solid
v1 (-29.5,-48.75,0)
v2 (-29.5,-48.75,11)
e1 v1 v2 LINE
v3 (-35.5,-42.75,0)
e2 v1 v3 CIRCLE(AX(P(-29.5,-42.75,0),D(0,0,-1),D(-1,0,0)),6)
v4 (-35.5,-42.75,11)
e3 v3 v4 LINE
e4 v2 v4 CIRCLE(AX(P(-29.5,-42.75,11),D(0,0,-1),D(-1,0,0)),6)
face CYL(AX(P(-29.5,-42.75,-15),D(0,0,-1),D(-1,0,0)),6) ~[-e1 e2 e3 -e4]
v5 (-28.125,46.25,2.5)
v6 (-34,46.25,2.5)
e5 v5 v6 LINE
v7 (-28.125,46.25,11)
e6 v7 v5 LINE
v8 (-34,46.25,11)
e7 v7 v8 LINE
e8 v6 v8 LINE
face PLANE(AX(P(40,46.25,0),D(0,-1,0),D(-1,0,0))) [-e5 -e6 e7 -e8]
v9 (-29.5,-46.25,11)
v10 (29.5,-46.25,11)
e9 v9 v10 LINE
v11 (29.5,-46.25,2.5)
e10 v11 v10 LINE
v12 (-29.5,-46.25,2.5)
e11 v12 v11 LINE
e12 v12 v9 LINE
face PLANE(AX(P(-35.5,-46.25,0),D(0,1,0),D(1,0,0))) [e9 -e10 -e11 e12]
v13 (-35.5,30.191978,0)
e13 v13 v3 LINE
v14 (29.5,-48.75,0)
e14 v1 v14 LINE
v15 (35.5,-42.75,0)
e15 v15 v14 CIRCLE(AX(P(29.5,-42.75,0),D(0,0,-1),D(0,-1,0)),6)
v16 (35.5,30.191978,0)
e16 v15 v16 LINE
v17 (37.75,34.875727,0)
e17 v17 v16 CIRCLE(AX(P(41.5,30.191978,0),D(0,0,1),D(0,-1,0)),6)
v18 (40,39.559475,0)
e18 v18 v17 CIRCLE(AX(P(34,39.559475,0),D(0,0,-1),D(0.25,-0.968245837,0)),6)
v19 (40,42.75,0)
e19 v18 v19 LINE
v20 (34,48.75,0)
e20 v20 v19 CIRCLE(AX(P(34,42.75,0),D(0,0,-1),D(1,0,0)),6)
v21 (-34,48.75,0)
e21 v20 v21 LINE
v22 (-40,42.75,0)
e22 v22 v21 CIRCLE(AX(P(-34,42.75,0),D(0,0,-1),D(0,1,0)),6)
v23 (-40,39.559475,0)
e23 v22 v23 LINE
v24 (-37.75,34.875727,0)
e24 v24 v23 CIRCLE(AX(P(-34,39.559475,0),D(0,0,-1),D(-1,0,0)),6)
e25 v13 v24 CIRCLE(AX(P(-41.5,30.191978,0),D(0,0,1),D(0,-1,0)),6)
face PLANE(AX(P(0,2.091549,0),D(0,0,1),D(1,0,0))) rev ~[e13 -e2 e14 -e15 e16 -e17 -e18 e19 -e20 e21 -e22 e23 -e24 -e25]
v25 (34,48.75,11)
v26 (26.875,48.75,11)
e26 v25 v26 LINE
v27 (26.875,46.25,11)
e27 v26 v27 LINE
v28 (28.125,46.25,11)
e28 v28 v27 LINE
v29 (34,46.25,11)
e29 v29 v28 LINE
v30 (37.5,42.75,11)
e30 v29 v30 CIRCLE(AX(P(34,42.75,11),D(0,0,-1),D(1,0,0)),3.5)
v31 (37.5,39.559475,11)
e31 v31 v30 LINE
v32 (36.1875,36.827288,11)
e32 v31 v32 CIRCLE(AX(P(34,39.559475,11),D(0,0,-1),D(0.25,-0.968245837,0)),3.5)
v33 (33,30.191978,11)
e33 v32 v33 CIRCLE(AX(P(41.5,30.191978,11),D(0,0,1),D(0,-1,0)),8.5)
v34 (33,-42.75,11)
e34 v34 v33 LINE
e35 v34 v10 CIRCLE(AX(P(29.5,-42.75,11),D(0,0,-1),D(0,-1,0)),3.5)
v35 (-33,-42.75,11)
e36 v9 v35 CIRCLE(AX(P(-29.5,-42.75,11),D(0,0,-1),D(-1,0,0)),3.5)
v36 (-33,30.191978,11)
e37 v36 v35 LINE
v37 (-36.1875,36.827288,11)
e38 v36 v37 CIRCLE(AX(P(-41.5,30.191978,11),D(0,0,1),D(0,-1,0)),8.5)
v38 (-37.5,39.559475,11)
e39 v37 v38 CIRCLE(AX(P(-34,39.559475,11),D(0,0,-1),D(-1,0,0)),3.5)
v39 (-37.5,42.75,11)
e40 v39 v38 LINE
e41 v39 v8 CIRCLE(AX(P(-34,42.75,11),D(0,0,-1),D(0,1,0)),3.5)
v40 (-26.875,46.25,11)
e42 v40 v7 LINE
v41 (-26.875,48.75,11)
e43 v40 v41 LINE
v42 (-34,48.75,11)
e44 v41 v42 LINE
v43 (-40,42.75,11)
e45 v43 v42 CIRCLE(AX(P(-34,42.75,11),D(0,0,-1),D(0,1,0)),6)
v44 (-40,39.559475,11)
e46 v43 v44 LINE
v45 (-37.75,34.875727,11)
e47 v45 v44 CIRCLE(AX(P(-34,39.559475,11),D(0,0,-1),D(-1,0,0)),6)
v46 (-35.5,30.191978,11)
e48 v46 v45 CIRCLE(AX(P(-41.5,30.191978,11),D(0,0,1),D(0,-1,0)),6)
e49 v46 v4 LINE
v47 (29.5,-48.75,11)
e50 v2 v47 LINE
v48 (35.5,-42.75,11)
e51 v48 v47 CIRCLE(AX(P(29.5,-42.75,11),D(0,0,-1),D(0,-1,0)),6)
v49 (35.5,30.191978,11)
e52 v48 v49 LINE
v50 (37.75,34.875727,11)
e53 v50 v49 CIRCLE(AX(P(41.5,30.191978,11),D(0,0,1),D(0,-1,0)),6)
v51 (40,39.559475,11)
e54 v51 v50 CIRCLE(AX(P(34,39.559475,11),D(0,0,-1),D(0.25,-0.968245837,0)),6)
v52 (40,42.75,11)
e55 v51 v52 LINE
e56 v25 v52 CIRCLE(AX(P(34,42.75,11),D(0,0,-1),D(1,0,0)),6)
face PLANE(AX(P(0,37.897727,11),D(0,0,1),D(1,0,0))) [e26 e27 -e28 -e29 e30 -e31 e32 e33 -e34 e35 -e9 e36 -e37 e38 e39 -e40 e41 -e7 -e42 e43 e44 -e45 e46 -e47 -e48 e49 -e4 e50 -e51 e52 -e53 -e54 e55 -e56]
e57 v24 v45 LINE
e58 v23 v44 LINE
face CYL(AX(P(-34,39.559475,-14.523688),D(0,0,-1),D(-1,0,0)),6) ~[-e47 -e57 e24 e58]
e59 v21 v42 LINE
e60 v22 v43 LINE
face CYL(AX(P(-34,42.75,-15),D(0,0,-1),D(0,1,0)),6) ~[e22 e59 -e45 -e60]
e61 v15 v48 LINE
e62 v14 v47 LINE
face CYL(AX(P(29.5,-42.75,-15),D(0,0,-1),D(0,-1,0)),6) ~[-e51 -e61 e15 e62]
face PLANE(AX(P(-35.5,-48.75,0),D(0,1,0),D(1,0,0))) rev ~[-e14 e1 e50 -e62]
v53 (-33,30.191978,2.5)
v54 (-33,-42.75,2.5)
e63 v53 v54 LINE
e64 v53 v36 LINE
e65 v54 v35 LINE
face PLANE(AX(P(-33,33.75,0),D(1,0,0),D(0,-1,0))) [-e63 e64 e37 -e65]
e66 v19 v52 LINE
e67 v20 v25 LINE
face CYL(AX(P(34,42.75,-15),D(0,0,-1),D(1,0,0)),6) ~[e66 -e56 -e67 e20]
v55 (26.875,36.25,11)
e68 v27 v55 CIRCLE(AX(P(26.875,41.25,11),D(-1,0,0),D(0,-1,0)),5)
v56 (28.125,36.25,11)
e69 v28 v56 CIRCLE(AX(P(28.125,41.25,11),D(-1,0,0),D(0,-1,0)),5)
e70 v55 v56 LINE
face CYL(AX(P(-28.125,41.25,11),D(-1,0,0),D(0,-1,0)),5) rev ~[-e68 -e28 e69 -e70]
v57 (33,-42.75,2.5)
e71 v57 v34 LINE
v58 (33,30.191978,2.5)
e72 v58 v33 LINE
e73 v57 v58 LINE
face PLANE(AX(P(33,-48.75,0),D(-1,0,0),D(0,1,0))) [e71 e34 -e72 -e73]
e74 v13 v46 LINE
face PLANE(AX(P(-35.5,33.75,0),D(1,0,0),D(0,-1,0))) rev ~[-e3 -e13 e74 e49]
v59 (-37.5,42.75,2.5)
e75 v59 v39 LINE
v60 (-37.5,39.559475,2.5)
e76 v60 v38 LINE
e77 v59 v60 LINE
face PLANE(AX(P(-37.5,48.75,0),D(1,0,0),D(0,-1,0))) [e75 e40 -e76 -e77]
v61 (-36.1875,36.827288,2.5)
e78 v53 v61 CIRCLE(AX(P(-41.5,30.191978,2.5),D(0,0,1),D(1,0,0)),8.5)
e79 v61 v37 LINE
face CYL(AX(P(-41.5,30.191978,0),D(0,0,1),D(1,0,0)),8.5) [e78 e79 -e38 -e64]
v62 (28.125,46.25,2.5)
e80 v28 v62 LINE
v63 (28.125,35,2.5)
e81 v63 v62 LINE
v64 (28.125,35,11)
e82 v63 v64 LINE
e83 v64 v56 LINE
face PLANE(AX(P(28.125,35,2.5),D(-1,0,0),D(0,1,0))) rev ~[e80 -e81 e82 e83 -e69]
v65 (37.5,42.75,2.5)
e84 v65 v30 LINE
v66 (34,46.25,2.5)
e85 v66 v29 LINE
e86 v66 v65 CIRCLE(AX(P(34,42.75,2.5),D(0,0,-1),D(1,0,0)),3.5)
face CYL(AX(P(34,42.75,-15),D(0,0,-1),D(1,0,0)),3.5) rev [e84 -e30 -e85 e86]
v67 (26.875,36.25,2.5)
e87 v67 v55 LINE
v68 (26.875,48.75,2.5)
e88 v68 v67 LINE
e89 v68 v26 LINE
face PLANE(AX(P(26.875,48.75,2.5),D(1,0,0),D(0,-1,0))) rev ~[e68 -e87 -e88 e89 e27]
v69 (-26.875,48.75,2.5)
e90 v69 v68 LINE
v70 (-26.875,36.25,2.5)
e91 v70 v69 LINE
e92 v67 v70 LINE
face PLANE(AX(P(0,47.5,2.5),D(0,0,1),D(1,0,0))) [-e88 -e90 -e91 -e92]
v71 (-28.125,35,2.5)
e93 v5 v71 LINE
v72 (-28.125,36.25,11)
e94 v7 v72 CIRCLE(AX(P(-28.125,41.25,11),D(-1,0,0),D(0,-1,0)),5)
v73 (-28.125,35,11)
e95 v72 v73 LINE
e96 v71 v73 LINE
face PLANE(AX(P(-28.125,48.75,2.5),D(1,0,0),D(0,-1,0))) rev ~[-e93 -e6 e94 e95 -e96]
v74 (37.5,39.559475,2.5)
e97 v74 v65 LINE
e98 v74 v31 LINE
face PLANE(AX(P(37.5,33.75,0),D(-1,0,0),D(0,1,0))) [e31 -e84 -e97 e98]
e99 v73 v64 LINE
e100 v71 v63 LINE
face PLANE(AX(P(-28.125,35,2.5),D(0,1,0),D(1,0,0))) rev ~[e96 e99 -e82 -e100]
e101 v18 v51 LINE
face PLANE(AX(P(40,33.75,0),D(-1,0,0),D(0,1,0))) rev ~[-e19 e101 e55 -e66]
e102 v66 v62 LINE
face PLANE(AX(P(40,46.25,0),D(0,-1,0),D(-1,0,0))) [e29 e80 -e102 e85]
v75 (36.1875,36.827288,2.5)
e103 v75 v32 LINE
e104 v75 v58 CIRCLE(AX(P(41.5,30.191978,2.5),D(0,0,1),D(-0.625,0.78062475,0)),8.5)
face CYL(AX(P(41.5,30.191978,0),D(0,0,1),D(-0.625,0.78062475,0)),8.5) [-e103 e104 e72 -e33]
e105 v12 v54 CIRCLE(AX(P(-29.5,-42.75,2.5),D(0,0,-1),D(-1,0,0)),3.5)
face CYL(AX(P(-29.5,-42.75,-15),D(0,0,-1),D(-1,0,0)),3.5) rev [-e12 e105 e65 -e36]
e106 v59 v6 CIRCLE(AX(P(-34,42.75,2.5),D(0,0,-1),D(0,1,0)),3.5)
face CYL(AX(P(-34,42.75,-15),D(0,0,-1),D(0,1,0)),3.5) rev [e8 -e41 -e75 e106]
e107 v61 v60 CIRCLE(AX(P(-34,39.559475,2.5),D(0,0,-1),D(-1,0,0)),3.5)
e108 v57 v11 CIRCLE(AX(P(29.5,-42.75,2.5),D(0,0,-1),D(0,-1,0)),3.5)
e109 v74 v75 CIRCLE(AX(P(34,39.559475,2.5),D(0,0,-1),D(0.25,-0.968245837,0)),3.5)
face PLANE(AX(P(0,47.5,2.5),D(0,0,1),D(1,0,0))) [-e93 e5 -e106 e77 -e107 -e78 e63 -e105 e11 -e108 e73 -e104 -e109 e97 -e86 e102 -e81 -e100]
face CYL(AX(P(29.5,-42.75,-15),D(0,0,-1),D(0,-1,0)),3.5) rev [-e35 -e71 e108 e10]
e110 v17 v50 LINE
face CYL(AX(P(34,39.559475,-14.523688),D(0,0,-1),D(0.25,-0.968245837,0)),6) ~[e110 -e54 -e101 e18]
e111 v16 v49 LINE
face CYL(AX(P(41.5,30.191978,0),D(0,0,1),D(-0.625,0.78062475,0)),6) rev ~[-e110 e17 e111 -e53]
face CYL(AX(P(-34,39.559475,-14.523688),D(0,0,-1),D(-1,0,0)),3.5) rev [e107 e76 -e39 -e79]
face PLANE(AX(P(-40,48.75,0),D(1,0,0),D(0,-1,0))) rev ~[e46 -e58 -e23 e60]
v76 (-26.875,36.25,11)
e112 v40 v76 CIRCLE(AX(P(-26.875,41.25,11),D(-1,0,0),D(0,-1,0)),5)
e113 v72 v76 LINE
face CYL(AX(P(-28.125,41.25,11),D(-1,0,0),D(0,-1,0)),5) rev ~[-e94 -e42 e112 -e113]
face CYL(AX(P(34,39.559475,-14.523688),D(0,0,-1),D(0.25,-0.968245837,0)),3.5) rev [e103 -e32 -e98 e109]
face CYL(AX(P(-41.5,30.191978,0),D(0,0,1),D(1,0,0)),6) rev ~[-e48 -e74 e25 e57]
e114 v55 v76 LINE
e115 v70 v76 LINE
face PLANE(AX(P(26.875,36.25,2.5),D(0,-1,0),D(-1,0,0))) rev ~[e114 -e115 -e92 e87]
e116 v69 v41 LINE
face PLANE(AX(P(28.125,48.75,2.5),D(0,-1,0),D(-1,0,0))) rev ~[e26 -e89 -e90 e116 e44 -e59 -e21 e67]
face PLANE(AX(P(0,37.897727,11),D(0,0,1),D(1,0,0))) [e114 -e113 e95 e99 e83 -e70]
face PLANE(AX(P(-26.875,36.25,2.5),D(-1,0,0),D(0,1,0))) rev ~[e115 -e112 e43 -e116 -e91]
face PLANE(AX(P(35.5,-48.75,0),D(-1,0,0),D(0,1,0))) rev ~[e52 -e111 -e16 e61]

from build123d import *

# Parameters (mm, degrees)
F4_DEPTH    = 11
F5_T1_DEPTH = 41
F5_T3_DEPTH = 40.0473750966
F6_R        = 6
F7_T        = -2.5
F8_W        = 56.25
F8_H        = 2.5
F9_DEPTH    = 8.5
F11_DEPTH   = 8.5
F12_R       = 5
F13_DEPTH   = 56.25


# Not quite as in the source:
# - a fillet or chamfer that OpenCascade refuses, or shapes differently, is made with other operations: its cross-section is extruded or revolved along the edge and cut away or added


with BuildPart() as f4:
    # F3 (on Top) → F4 (new body)
    with BuildSketch(Plane.XY):
        Polygon((-35.5, 33.75), (-35.5, -48.75), (35.5, -48.75), (35.5, 33.75), (40, 33.75), (40, 48.75), (-40, 48.75), (-40, 33.75), align=None)
    extrude(amount=F4_DEPTH)

    # F5: fillet of radius 6 on 6 edges, made by hand

    # F5_s2 → F5_t1 (cut)
    with BuildSketch(Plane.XY.offset(-15)):
        with BuildLine():
            ThreePointArc((-35.5, -42.75), (-33.7426406871, -46.9926406871), (-29.5, -48.75))
            Line((-29.5, -48.75), (-35.5, -48.75))
            Line((-35.5, -48.75), (-35.5, -42.75))
        make_face()
        with BuildLine():
            ThreePointArc((29.5, -48.75), (33.7426406871, -46.9926406871), (35.5, -42.75))
            Line((35.5, -42.75), (35.5, -48.75))
            Line((35.5, -48.75), (29.5, -48.75))
        make_face()
        with BuildLine():
            ThreePointArc((40, 42.75), (38.2426406871, 46.9926406871), (34, 48.75))
            Line((34, 48.75), (40, 48.75))
            Line((40, 48.75), (40, 42.75))
        make_face()
        with BuildLine():
            ThreePointArc((-34, 48.75), (-38.2426406871, 46.9926406871), (-40, 42.75))
            Line((-40, 42.75), (-40, 48.75))
            Line((-40, 48.75), (-34, 48.75))
        make_face()
    extrude(amount=F5_T1_DEPTH, mode=Mode.SUBTRACT)

    # F5_s4 → F5_t3 (cut)
    with BuildSketch(Plane.XY.offset(-14.5236875483)):
        with BuildLine():
            ThreePointArc((-40, 39.5594750193), (-38.7434164903, 35.8852404051), (-35.5, 33.75))
            Line((-35.5, 33.75), (-40, 33.75))
            Line((-40, 33.75), (-40, 39.5594750193))
        make_face()
        with BuildLine():
            ThreePointArc((35.5, 33.75), (38.7434164903, 35.8852404051), (40, 39.5594750193))
            Line((40, 39.5594750193), (40, 33.75))
            Line((40, 33.75), (35.5, 33.75))
        make_face()
    extrude(amount=F5_T3_DEPTH, mode=Mode.SUBTRACT)

    # F6
    f6_edges = [f4.edges().sort_by_distance(p)[0] for p in [
        (35.5, 33.75, 5.5),
        (-35.5, 33.75, 5.5),
    ]]
    fillet(f6_edges, radius=F6_R)

    # F7
    f7_openings = [f4.faces().sort_by_distance(p)[0] for p in [
        (0, 0.742075, 11),
    ]]
    offset(amount=F7_T, openings=f7_openings)

    # F8 (on face) → F9 (cut)
    with BuildSketch(Plane.XY.offset(11)):
        with Locations((0, 47.5)):
            Rectangle(F8_W, F8_H)
    extrude(amount=-F9_DEPTH, mode=Mode.SUBTRACT)

    # F10 (on face) → F11 (join)
    with BuildSketch(Plane.XY.offset(2.5)):
        Polygon((-28.125, 48.75), (-28.125, 46.25), (-28.125, 35), (28.125, 35), (28.125, 48.75), (26.875, 48.75), (26.875, 36.25), (-26.875, 36.25), (-26.875, 48.75), align=None)
    extrude(amount=F11_DEPTH)

    # F12 (on face) → F13 (cut)
    with BuildSketch(Plane(origin=(-28.125, 0, 0), x_dir=(0, -1, 0), z_dir=(-1, 0, 0))):
        with Locations((-41.25, 11)):
            Circle(F12_R)
    extrude(amount=-F13_DEPTH, mode=Mode.SUBTRACT)


solid = f4.part
